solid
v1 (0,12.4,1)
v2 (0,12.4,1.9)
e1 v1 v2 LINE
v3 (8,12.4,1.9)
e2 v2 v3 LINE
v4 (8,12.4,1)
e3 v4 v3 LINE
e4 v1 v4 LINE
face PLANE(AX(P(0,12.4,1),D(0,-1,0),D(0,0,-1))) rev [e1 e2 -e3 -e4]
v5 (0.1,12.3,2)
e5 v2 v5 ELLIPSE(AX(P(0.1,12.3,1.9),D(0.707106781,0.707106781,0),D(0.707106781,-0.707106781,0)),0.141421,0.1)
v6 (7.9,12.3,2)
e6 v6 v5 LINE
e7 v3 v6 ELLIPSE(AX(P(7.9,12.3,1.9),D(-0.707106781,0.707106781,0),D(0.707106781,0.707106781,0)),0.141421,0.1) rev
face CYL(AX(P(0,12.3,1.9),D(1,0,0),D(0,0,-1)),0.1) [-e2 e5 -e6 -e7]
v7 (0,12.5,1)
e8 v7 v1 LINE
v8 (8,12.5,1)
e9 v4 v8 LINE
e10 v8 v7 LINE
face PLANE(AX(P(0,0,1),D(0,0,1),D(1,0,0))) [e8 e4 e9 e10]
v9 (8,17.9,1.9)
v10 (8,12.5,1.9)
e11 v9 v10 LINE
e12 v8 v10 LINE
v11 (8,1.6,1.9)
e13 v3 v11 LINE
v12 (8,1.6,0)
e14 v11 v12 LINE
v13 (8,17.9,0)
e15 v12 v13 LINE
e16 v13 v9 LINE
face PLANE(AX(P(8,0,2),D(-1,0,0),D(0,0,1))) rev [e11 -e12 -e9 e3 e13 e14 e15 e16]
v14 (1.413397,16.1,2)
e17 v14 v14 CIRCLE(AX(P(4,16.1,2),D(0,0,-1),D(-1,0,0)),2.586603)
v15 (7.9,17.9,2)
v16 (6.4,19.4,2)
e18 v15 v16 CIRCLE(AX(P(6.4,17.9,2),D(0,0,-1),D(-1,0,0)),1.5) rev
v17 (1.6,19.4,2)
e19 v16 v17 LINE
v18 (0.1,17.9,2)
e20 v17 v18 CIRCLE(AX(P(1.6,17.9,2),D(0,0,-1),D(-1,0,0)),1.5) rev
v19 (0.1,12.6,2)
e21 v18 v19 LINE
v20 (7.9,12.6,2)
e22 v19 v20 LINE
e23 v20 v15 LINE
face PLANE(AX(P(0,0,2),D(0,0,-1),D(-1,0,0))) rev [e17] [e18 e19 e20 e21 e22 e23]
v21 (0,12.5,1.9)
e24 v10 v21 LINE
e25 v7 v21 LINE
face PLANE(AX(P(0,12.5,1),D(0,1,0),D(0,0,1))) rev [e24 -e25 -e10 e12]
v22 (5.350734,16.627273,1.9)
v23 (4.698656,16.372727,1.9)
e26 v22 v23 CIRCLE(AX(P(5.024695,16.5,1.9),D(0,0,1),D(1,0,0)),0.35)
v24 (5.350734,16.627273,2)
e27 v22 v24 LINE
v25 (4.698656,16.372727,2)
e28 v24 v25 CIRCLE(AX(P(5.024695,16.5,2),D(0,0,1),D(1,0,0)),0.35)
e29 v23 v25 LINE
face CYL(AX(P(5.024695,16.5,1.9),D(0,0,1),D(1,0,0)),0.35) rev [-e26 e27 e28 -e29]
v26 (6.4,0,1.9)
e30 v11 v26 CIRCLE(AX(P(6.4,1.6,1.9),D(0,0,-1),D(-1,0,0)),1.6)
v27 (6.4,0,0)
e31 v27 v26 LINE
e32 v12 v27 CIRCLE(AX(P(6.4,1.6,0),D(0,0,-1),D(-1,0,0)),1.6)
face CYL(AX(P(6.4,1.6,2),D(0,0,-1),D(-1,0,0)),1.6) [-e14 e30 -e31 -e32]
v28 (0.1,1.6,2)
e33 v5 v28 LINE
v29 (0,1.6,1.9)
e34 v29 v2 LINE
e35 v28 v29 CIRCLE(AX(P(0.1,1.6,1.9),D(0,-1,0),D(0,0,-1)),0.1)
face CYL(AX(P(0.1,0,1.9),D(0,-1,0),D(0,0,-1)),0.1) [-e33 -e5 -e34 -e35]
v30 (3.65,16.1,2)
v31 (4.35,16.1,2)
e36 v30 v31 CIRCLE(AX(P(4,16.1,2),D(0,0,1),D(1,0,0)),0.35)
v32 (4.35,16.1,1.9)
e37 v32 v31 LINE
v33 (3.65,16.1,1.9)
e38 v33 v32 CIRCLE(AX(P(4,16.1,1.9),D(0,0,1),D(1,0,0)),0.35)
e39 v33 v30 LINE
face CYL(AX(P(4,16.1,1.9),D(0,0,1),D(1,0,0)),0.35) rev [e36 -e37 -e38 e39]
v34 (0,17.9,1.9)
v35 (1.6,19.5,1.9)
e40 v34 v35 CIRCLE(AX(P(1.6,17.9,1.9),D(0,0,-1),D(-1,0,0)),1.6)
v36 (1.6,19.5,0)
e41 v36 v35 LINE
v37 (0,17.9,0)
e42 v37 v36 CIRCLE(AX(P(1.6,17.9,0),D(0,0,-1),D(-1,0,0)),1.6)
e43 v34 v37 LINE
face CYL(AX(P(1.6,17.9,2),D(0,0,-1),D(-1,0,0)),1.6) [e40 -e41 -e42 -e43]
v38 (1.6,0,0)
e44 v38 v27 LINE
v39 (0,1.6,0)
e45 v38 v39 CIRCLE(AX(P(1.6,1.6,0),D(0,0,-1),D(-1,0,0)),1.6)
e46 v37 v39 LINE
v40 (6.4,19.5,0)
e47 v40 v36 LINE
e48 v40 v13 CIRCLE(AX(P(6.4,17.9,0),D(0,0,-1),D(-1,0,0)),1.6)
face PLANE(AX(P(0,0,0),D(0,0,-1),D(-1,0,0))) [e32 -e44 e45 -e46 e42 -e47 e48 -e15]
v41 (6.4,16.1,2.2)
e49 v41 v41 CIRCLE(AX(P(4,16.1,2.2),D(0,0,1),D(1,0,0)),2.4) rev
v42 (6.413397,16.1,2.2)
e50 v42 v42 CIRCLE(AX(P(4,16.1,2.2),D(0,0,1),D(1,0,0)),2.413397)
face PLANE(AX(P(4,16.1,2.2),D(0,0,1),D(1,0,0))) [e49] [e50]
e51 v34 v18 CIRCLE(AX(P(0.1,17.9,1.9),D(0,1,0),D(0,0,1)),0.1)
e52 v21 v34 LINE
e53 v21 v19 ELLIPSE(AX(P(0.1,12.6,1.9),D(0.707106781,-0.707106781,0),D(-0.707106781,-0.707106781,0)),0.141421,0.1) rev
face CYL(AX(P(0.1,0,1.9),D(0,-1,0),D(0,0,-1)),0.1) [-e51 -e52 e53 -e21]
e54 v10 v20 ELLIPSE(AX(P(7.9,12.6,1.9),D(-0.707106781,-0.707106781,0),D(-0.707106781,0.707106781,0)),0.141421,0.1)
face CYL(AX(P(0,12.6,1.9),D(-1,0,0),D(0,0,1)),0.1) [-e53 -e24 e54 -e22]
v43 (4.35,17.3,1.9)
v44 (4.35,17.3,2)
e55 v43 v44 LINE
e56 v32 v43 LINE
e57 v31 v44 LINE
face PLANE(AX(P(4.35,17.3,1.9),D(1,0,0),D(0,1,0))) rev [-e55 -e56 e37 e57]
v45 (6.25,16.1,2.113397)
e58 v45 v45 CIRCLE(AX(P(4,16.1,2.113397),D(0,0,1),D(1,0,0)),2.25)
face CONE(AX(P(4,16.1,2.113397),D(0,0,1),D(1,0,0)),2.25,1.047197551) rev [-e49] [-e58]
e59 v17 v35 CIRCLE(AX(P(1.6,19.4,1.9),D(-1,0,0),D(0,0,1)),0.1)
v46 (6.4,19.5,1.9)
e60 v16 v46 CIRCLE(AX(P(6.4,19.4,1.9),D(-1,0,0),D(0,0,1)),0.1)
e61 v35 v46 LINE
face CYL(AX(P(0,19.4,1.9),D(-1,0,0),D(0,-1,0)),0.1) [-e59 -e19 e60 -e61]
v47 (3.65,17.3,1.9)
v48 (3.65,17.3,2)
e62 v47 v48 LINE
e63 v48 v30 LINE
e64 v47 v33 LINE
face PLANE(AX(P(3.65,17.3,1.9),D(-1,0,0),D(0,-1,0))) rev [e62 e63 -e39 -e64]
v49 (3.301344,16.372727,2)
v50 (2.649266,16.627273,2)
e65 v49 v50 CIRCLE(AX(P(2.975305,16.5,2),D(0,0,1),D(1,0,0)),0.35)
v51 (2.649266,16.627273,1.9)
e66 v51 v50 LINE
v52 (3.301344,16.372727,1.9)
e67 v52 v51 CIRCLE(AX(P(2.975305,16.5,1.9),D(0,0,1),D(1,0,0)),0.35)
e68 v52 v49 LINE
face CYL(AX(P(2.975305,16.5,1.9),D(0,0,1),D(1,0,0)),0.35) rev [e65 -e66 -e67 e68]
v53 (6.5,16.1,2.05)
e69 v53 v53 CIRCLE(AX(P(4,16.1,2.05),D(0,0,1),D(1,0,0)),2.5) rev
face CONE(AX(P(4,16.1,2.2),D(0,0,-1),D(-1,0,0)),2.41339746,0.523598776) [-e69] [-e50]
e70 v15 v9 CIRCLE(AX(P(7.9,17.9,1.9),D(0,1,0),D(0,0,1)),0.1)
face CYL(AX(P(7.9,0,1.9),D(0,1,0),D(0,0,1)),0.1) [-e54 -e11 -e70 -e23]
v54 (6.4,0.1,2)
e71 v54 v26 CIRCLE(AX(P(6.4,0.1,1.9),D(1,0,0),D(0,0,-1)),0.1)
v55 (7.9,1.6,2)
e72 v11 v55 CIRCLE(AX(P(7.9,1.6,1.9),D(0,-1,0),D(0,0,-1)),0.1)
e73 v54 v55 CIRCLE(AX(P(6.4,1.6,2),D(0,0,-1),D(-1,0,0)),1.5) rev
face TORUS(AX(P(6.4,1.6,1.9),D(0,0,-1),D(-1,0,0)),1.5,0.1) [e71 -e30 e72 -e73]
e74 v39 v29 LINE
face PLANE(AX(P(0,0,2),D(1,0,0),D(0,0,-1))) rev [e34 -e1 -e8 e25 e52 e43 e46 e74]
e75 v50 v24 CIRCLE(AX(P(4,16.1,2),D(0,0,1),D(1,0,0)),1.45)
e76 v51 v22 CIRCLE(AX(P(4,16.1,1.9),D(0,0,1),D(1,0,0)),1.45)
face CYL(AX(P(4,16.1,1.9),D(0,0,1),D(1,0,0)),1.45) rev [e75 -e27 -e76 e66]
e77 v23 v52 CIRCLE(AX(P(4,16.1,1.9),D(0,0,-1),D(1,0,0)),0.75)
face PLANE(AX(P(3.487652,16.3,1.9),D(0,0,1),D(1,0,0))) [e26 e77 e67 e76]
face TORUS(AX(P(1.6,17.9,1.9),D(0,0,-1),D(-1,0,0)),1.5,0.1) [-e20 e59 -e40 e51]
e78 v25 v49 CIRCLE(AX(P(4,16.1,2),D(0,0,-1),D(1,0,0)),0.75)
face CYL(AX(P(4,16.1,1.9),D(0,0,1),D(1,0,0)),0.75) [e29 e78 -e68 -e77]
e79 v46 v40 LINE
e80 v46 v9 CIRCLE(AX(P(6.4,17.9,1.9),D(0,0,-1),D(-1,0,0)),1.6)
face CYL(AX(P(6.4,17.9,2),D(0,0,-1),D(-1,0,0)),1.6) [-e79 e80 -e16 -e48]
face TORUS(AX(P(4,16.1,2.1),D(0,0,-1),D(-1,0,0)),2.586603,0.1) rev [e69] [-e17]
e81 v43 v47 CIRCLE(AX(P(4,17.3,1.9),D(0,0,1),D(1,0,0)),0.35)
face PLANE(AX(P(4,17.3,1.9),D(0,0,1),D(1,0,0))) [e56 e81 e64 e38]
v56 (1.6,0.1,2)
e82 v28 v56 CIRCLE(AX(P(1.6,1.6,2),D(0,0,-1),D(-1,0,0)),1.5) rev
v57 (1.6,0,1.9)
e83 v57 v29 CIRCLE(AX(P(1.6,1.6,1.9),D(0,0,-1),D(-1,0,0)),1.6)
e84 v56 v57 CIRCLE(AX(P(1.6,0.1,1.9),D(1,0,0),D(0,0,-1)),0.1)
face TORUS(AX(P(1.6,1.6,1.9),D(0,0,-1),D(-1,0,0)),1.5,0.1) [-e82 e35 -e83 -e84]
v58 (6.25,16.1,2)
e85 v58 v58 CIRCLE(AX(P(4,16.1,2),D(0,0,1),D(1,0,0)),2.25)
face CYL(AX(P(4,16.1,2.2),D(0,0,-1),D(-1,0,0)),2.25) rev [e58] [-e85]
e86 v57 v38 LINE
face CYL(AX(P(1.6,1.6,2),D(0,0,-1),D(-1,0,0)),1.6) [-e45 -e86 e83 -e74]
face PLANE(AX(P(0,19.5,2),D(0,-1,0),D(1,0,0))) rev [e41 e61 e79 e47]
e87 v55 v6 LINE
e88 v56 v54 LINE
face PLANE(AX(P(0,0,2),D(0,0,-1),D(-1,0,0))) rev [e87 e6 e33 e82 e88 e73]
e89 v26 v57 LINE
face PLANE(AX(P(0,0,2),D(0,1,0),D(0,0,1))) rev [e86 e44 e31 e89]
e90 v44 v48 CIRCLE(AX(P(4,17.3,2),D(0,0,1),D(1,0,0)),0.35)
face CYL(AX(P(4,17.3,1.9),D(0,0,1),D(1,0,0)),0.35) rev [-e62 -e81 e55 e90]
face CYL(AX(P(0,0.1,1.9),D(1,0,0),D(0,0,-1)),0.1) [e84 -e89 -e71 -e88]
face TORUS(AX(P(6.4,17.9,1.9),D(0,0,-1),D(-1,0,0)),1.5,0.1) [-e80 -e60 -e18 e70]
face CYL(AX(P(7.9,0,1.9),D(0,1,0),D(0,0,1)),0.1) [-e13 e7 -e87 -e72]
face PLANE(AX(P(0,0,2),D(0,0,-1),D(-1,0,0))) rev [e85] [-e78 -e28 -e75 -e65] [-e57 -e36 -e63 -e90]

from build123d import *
from OCP.BRepFilletAPI import BRepFilletAPI_MakeChamfer

# Parameters (mm, degrees)
SKETCH1_W           = 8
SKETCH1_H           = 19.5
BOSS_EXTRUDE1_DEPTH = 2
FILLET1_R           = 1.6
CUT_EXTRUDE1_DEPTH  = 0.1
SKETCH4_R           = 2.5
SKETCH4_R_2         = 2.25
BOSS_EXTRUDE2_DEPTH = 0.2
CHAMFER1_SIZE       = 0.15
CHAMFER1_SIZE2      = 0.08660254
SKETCH5_W           = 8
SKETCH5_H           = 0.1
CUT_EXTRUDE2_DEPTH  = 1
FILLET2_R           = 0.1


with BuildPart() as part:
    # Sketch1 → Boss-Extrude1 (new body)
    with BuildSketch(Plane.XY):
        with Locations((4, 9.75)):
            Rectangle(SKETCH1_W, SKETCH1_H)
    extrude(amount=BOSS_EXTRUDE1_DEPTH)

    # Fillet1
    fillet1_edges = [part.edges().sort_by_distance(p)[0] for p in [
        (0, 19.5, 1),
        (8, 19.5, 1),
        (8, 0, 1),
        (0, 0, 1),
    ]]
    fillet(fillet1_edges, radius=FILLET1_R)

    # Sketch3 → Cut-Extrude1 (cut)
    with BuildSketch(Plane.XY.offset(2)):
        with BuildLine():
            Line((4.35, 17.3), (4.35, 16.1))
            ThreePointArc((4.35, 16.1), (4, 15.75), (3.65, 16.1))
            Line((3.65, 16.1), (3.65, 17.3))
            ThreePointArc((3.65, 17.3), (4, 17.65), (4.35, 17.3))
        make_face()
        with BuildLine():
            ThreePointArc((2.649265581, 16.627272727), (4, 14.65), (5.350734419, 16.627272727))
            ThreePointArc((5.350734419, 16.627272727), (4.897422349, 16.826039343), (4.698655734, 16.372727273))
            ThreePointArc((4.698655734, 16.372727273), (4, 15.35), (3.301344266, 16.372727273))
            ThreePointArc((3.301344266, 16.372727273), (3.102577651, 16.826039343), (2.649265581, 16.627272727))
        make_face()
    extrude(amount=-CUT_EXTRUDE1_DEPTH, mode=Mode.SUBTRACT)

    # Sketch4 → Boss-Extrude2 (add)
    with BuildSketch(Plane.XY.offset(2)):
        with Locations(Location((4, 16.1, 0), (0, 0, 180))):
            Circle(SKETCH4_R)
        with Locations((4, 16.1)):
            Circle(SKETCH4_R_2, mode=Mode.SUBTRACT)
    extrude(amount=BOSS_EXTRUDE2_DEPTH)

    # Chamfer1: one chamfer whose edges measure the first distance from different faces: ONE call of the kernel's chamfer builder (chamfer() names one face for all edges)
    chamfer1_edges_1 = [part.edges().sort_by_distance(p)[0] for p in [
        (6.5, 16.1, 2.2),
    ]]
    chamfer1_side_1 = [part.faces().sort_by_distance(p)[0] for p in [
        (6.5, 16.1, 2.1),
    ]]
    chamfer1_edges_2 = [part.edges().sort_by_distance(p)[0] for p in [
        (1.75, 16.1, 2.2),
    ]]
    chamfer1_side_2 = [part.faces().sort_by_distance(p)[0] for p in [
        (6.429289322, 16.1, 2.2),
    ]]
    chamfer1 = BRepFilletAPI_MakeChamfer(part.part.solid().wrapped)
    for e in chamfer1_edges_1:
        chamfer1.Add(CHAMFER1_SIZE, CHAMFER1_SIZE2, e.wrapped, chamfer1_side_1[0].wrapped)  # the first distance lies on this face
    for e in chamfer1_edges_2:
        chamfer1.Add(CHAMFER1_SIZE, CHAMFER1_SIZE2, e.wrapped, chamfer1_side_2[0].wrapped)  # the first distance lies on this face
    add(Compound.cast(chamfer1.Shape()), mode=Mode.REPLACE)

    # Sketch5 → Cut-Extrude2 (cut)
    with BuildSketch(Plane.XY.offset(2)):
        with Locations((4, 12.45)):
            Rectangle(SKETCH5_W, SKETCH5_H)
    extrude(amount=-CUT_EXTRUDE2_DEPTH, mode=Mode.SUBTRACT)

    # Fillet2
    # the kernel refuses this fillet: 0.1 mm, written as the material it adds along each edge
    with BuildSketch(Plane(origin=(4, 16.1, 2), x_dir=(-1, 0, 0), z_dir=(0, 1, 0))) as fillet2_piece_1:
        with BuildLine():
            CenterArc((2.58660254, 0.1), FILLET2_R, 210, 60)
            Line((2.58660254, 0), (2.5, 0))
            Line((2.5, 0), (2.5, 0.05))
        make_face()
    revolve(axis=Axis((4, 16.1, 2), (0, 0, 1)))
    # the kernel refuses this fillet: 0.1 mm, written as the material it takes off along each edge
    with BuildSketch(Plane(origin=(8, 1.6, 2), x_dir=(0, 0, -1), z_dir=(0, 1, 0)), Plane(origin=(0, 12.65, 2), x_dir=(0, 0, -1), z_dir=(0, -1, 0))) as fillet2_2_piece_1:
        with BuildLine():
            CenterArc((FILLET2_R, FILLET2_R), FILLET2_R, 180, 90)
            Line((0, FILLET2_R), (0, 0))
            Line((0, 0), (FILLET2_R, 0))
        make_face()
    extrude(amount=11.05, mode=Mode.SUBTRACT)
    with BuildSketch(Plane(origin=(1.6, 0, 2), x_dir=(0, 1, 0), z_dir=(1, 0, 0)), Plane(origin=(6.4, 19.5, 2), x_dir=(0, -1, 0), z_dir=(-1, 0, 0))) as fillet2_2_piece_2:
        with BuildLine():
            CenterArc((FILLET2_R, -FILLET2_R), FILLET2_R, 90, 90)
            Line((0, -FILLET2_R), (0, 0))
            Line((0, 0), (FILLET2_R, 0))
        make_face()
    extrude(amount=4.8, mode=Mode.SUBTRACT)
    with BuildSketch(Plane(origin=(0, 17.9, 2), x_dir=(1, 0, 0), z_dir=(0, -1, 0)), Plane(origin=(8, 12.25, 2), x_dir=(-1, 0, 0), z_dir=(0, 1, 0))) as fillet2_2_piece_3:
        with BuildLine():
            CenterArc((FILLET2_R, -FILLET2_R), FILLET2_R, 90, 90)
            Line((0, -FILLET2_R), (0, 0))
            Line((0, 0), (FILLET2_R, 0))
        make_face()
    extrude(amount=5.65, mode=Mode.SUBTRACT)
    with BuildSketch(Plane(origin=(1.6, 17.9, 2), x_dir=(0, 1, 0), z_dir=(1, 0, 0))) as fillet2_2_piece_4:
        with BuildLine():
            CenterArc((1.6 - FILLET2_R, -FILLET2_R), FILLET2_R, 0, 90)
            Line((1.6, -FILLET2_R), (1.6, 0))
            Line((1.6, 0), (1.6 - FILLET2_R, 0))
        make_face()
    revolve(axis=Axis((1.6, 17.9, 2), (0, 0, 1)), revolution_arc=90, mode=Mode.SUBTRACT)
    with BuildSketch(Plane(origin=(6.4, 17.9, 2), x_dir=(1, 0, 0), z_dir=(0, -1, 0))) as fillet2_2_piece_5:
        with BuildLine():
            CenterArc((1.6 - FILLET2_R, -FILLET2_R), FILLET2_R, 0, 90)
            Line((1.6, -FILLET2_R), (1.6, 0))
            Line((1.6, 0), (1.6 - FILLET2_R, 0))
        make_face()
    revolve(axis=Axis((6.4, 17.9, 2), (0, 0, 1)), revolution_arc=90, mode=Mode.SUBTRACT)
    with BuildSketch(Plane(origin=(1.6, 1.6, 2), x_dir=(0, -1, 0), z_dir=(1, 0, 0))) as fillet2_2_piece_6:
        with BuildLine():
            CenterArc((1.6 - FILLET2_R, FILLET2_R), FILLET2_R, 270, 90)
            Line((1.6 - FILLET2_R, 0), (1.6, 0))
            Line((1.6, 0), (1.6, FILLET2_R))
        make_face()
    revolve(axis=Axis((1.6, 1.6, 2), (0, 0, -1)), revolution_arc=90, mode=Mode.SUBTRACT)
    with BuildSketch(Plane(origin=(6.4, 1.6, 2), x_dir=(0, -1, 0), z_dir=(-1, 0, 0))) as fillet2_2_piece_7:
        with BuildLine():
            CenterArc((1.6 - FILLET2_R, -FILLET2_R), FILLET2_R, 0, 90)
            Line((1.6, -FILLET2_R), (1.6, 0))
            Line((1.6, 0), (1.6 - FILLET2_R, 0))
        make_face()
    revolve(axis=Axis((6.4, 1.6, 2), (0, 0, 1)), revolution_arc=90, mode=Mode.SUBTRACT)
    with BuildSketch(Plane(origin=(8.25, 12.4, 2), x_dir=(0, -1, 0), z_dir=(-1, 0, 0)), Plane(origin=(-0.25, 12.5, 2), x_dir=(0, 1, 0), z_dir=(1, 0, 0))) as fillet2_2_piece_8:
        with BuildLine():
            CenterArc((FILLET2_R, -FILLET2_R), FILLET2_R, 90, 90)
            Line((0, -FILLET2_R), (0, 0))
            Line((0, 0), (FILLET2_R, 0))
        make_face()
    extrude(amount=8.5, mode=Mode.SUBTRACT)


solid = part.part
